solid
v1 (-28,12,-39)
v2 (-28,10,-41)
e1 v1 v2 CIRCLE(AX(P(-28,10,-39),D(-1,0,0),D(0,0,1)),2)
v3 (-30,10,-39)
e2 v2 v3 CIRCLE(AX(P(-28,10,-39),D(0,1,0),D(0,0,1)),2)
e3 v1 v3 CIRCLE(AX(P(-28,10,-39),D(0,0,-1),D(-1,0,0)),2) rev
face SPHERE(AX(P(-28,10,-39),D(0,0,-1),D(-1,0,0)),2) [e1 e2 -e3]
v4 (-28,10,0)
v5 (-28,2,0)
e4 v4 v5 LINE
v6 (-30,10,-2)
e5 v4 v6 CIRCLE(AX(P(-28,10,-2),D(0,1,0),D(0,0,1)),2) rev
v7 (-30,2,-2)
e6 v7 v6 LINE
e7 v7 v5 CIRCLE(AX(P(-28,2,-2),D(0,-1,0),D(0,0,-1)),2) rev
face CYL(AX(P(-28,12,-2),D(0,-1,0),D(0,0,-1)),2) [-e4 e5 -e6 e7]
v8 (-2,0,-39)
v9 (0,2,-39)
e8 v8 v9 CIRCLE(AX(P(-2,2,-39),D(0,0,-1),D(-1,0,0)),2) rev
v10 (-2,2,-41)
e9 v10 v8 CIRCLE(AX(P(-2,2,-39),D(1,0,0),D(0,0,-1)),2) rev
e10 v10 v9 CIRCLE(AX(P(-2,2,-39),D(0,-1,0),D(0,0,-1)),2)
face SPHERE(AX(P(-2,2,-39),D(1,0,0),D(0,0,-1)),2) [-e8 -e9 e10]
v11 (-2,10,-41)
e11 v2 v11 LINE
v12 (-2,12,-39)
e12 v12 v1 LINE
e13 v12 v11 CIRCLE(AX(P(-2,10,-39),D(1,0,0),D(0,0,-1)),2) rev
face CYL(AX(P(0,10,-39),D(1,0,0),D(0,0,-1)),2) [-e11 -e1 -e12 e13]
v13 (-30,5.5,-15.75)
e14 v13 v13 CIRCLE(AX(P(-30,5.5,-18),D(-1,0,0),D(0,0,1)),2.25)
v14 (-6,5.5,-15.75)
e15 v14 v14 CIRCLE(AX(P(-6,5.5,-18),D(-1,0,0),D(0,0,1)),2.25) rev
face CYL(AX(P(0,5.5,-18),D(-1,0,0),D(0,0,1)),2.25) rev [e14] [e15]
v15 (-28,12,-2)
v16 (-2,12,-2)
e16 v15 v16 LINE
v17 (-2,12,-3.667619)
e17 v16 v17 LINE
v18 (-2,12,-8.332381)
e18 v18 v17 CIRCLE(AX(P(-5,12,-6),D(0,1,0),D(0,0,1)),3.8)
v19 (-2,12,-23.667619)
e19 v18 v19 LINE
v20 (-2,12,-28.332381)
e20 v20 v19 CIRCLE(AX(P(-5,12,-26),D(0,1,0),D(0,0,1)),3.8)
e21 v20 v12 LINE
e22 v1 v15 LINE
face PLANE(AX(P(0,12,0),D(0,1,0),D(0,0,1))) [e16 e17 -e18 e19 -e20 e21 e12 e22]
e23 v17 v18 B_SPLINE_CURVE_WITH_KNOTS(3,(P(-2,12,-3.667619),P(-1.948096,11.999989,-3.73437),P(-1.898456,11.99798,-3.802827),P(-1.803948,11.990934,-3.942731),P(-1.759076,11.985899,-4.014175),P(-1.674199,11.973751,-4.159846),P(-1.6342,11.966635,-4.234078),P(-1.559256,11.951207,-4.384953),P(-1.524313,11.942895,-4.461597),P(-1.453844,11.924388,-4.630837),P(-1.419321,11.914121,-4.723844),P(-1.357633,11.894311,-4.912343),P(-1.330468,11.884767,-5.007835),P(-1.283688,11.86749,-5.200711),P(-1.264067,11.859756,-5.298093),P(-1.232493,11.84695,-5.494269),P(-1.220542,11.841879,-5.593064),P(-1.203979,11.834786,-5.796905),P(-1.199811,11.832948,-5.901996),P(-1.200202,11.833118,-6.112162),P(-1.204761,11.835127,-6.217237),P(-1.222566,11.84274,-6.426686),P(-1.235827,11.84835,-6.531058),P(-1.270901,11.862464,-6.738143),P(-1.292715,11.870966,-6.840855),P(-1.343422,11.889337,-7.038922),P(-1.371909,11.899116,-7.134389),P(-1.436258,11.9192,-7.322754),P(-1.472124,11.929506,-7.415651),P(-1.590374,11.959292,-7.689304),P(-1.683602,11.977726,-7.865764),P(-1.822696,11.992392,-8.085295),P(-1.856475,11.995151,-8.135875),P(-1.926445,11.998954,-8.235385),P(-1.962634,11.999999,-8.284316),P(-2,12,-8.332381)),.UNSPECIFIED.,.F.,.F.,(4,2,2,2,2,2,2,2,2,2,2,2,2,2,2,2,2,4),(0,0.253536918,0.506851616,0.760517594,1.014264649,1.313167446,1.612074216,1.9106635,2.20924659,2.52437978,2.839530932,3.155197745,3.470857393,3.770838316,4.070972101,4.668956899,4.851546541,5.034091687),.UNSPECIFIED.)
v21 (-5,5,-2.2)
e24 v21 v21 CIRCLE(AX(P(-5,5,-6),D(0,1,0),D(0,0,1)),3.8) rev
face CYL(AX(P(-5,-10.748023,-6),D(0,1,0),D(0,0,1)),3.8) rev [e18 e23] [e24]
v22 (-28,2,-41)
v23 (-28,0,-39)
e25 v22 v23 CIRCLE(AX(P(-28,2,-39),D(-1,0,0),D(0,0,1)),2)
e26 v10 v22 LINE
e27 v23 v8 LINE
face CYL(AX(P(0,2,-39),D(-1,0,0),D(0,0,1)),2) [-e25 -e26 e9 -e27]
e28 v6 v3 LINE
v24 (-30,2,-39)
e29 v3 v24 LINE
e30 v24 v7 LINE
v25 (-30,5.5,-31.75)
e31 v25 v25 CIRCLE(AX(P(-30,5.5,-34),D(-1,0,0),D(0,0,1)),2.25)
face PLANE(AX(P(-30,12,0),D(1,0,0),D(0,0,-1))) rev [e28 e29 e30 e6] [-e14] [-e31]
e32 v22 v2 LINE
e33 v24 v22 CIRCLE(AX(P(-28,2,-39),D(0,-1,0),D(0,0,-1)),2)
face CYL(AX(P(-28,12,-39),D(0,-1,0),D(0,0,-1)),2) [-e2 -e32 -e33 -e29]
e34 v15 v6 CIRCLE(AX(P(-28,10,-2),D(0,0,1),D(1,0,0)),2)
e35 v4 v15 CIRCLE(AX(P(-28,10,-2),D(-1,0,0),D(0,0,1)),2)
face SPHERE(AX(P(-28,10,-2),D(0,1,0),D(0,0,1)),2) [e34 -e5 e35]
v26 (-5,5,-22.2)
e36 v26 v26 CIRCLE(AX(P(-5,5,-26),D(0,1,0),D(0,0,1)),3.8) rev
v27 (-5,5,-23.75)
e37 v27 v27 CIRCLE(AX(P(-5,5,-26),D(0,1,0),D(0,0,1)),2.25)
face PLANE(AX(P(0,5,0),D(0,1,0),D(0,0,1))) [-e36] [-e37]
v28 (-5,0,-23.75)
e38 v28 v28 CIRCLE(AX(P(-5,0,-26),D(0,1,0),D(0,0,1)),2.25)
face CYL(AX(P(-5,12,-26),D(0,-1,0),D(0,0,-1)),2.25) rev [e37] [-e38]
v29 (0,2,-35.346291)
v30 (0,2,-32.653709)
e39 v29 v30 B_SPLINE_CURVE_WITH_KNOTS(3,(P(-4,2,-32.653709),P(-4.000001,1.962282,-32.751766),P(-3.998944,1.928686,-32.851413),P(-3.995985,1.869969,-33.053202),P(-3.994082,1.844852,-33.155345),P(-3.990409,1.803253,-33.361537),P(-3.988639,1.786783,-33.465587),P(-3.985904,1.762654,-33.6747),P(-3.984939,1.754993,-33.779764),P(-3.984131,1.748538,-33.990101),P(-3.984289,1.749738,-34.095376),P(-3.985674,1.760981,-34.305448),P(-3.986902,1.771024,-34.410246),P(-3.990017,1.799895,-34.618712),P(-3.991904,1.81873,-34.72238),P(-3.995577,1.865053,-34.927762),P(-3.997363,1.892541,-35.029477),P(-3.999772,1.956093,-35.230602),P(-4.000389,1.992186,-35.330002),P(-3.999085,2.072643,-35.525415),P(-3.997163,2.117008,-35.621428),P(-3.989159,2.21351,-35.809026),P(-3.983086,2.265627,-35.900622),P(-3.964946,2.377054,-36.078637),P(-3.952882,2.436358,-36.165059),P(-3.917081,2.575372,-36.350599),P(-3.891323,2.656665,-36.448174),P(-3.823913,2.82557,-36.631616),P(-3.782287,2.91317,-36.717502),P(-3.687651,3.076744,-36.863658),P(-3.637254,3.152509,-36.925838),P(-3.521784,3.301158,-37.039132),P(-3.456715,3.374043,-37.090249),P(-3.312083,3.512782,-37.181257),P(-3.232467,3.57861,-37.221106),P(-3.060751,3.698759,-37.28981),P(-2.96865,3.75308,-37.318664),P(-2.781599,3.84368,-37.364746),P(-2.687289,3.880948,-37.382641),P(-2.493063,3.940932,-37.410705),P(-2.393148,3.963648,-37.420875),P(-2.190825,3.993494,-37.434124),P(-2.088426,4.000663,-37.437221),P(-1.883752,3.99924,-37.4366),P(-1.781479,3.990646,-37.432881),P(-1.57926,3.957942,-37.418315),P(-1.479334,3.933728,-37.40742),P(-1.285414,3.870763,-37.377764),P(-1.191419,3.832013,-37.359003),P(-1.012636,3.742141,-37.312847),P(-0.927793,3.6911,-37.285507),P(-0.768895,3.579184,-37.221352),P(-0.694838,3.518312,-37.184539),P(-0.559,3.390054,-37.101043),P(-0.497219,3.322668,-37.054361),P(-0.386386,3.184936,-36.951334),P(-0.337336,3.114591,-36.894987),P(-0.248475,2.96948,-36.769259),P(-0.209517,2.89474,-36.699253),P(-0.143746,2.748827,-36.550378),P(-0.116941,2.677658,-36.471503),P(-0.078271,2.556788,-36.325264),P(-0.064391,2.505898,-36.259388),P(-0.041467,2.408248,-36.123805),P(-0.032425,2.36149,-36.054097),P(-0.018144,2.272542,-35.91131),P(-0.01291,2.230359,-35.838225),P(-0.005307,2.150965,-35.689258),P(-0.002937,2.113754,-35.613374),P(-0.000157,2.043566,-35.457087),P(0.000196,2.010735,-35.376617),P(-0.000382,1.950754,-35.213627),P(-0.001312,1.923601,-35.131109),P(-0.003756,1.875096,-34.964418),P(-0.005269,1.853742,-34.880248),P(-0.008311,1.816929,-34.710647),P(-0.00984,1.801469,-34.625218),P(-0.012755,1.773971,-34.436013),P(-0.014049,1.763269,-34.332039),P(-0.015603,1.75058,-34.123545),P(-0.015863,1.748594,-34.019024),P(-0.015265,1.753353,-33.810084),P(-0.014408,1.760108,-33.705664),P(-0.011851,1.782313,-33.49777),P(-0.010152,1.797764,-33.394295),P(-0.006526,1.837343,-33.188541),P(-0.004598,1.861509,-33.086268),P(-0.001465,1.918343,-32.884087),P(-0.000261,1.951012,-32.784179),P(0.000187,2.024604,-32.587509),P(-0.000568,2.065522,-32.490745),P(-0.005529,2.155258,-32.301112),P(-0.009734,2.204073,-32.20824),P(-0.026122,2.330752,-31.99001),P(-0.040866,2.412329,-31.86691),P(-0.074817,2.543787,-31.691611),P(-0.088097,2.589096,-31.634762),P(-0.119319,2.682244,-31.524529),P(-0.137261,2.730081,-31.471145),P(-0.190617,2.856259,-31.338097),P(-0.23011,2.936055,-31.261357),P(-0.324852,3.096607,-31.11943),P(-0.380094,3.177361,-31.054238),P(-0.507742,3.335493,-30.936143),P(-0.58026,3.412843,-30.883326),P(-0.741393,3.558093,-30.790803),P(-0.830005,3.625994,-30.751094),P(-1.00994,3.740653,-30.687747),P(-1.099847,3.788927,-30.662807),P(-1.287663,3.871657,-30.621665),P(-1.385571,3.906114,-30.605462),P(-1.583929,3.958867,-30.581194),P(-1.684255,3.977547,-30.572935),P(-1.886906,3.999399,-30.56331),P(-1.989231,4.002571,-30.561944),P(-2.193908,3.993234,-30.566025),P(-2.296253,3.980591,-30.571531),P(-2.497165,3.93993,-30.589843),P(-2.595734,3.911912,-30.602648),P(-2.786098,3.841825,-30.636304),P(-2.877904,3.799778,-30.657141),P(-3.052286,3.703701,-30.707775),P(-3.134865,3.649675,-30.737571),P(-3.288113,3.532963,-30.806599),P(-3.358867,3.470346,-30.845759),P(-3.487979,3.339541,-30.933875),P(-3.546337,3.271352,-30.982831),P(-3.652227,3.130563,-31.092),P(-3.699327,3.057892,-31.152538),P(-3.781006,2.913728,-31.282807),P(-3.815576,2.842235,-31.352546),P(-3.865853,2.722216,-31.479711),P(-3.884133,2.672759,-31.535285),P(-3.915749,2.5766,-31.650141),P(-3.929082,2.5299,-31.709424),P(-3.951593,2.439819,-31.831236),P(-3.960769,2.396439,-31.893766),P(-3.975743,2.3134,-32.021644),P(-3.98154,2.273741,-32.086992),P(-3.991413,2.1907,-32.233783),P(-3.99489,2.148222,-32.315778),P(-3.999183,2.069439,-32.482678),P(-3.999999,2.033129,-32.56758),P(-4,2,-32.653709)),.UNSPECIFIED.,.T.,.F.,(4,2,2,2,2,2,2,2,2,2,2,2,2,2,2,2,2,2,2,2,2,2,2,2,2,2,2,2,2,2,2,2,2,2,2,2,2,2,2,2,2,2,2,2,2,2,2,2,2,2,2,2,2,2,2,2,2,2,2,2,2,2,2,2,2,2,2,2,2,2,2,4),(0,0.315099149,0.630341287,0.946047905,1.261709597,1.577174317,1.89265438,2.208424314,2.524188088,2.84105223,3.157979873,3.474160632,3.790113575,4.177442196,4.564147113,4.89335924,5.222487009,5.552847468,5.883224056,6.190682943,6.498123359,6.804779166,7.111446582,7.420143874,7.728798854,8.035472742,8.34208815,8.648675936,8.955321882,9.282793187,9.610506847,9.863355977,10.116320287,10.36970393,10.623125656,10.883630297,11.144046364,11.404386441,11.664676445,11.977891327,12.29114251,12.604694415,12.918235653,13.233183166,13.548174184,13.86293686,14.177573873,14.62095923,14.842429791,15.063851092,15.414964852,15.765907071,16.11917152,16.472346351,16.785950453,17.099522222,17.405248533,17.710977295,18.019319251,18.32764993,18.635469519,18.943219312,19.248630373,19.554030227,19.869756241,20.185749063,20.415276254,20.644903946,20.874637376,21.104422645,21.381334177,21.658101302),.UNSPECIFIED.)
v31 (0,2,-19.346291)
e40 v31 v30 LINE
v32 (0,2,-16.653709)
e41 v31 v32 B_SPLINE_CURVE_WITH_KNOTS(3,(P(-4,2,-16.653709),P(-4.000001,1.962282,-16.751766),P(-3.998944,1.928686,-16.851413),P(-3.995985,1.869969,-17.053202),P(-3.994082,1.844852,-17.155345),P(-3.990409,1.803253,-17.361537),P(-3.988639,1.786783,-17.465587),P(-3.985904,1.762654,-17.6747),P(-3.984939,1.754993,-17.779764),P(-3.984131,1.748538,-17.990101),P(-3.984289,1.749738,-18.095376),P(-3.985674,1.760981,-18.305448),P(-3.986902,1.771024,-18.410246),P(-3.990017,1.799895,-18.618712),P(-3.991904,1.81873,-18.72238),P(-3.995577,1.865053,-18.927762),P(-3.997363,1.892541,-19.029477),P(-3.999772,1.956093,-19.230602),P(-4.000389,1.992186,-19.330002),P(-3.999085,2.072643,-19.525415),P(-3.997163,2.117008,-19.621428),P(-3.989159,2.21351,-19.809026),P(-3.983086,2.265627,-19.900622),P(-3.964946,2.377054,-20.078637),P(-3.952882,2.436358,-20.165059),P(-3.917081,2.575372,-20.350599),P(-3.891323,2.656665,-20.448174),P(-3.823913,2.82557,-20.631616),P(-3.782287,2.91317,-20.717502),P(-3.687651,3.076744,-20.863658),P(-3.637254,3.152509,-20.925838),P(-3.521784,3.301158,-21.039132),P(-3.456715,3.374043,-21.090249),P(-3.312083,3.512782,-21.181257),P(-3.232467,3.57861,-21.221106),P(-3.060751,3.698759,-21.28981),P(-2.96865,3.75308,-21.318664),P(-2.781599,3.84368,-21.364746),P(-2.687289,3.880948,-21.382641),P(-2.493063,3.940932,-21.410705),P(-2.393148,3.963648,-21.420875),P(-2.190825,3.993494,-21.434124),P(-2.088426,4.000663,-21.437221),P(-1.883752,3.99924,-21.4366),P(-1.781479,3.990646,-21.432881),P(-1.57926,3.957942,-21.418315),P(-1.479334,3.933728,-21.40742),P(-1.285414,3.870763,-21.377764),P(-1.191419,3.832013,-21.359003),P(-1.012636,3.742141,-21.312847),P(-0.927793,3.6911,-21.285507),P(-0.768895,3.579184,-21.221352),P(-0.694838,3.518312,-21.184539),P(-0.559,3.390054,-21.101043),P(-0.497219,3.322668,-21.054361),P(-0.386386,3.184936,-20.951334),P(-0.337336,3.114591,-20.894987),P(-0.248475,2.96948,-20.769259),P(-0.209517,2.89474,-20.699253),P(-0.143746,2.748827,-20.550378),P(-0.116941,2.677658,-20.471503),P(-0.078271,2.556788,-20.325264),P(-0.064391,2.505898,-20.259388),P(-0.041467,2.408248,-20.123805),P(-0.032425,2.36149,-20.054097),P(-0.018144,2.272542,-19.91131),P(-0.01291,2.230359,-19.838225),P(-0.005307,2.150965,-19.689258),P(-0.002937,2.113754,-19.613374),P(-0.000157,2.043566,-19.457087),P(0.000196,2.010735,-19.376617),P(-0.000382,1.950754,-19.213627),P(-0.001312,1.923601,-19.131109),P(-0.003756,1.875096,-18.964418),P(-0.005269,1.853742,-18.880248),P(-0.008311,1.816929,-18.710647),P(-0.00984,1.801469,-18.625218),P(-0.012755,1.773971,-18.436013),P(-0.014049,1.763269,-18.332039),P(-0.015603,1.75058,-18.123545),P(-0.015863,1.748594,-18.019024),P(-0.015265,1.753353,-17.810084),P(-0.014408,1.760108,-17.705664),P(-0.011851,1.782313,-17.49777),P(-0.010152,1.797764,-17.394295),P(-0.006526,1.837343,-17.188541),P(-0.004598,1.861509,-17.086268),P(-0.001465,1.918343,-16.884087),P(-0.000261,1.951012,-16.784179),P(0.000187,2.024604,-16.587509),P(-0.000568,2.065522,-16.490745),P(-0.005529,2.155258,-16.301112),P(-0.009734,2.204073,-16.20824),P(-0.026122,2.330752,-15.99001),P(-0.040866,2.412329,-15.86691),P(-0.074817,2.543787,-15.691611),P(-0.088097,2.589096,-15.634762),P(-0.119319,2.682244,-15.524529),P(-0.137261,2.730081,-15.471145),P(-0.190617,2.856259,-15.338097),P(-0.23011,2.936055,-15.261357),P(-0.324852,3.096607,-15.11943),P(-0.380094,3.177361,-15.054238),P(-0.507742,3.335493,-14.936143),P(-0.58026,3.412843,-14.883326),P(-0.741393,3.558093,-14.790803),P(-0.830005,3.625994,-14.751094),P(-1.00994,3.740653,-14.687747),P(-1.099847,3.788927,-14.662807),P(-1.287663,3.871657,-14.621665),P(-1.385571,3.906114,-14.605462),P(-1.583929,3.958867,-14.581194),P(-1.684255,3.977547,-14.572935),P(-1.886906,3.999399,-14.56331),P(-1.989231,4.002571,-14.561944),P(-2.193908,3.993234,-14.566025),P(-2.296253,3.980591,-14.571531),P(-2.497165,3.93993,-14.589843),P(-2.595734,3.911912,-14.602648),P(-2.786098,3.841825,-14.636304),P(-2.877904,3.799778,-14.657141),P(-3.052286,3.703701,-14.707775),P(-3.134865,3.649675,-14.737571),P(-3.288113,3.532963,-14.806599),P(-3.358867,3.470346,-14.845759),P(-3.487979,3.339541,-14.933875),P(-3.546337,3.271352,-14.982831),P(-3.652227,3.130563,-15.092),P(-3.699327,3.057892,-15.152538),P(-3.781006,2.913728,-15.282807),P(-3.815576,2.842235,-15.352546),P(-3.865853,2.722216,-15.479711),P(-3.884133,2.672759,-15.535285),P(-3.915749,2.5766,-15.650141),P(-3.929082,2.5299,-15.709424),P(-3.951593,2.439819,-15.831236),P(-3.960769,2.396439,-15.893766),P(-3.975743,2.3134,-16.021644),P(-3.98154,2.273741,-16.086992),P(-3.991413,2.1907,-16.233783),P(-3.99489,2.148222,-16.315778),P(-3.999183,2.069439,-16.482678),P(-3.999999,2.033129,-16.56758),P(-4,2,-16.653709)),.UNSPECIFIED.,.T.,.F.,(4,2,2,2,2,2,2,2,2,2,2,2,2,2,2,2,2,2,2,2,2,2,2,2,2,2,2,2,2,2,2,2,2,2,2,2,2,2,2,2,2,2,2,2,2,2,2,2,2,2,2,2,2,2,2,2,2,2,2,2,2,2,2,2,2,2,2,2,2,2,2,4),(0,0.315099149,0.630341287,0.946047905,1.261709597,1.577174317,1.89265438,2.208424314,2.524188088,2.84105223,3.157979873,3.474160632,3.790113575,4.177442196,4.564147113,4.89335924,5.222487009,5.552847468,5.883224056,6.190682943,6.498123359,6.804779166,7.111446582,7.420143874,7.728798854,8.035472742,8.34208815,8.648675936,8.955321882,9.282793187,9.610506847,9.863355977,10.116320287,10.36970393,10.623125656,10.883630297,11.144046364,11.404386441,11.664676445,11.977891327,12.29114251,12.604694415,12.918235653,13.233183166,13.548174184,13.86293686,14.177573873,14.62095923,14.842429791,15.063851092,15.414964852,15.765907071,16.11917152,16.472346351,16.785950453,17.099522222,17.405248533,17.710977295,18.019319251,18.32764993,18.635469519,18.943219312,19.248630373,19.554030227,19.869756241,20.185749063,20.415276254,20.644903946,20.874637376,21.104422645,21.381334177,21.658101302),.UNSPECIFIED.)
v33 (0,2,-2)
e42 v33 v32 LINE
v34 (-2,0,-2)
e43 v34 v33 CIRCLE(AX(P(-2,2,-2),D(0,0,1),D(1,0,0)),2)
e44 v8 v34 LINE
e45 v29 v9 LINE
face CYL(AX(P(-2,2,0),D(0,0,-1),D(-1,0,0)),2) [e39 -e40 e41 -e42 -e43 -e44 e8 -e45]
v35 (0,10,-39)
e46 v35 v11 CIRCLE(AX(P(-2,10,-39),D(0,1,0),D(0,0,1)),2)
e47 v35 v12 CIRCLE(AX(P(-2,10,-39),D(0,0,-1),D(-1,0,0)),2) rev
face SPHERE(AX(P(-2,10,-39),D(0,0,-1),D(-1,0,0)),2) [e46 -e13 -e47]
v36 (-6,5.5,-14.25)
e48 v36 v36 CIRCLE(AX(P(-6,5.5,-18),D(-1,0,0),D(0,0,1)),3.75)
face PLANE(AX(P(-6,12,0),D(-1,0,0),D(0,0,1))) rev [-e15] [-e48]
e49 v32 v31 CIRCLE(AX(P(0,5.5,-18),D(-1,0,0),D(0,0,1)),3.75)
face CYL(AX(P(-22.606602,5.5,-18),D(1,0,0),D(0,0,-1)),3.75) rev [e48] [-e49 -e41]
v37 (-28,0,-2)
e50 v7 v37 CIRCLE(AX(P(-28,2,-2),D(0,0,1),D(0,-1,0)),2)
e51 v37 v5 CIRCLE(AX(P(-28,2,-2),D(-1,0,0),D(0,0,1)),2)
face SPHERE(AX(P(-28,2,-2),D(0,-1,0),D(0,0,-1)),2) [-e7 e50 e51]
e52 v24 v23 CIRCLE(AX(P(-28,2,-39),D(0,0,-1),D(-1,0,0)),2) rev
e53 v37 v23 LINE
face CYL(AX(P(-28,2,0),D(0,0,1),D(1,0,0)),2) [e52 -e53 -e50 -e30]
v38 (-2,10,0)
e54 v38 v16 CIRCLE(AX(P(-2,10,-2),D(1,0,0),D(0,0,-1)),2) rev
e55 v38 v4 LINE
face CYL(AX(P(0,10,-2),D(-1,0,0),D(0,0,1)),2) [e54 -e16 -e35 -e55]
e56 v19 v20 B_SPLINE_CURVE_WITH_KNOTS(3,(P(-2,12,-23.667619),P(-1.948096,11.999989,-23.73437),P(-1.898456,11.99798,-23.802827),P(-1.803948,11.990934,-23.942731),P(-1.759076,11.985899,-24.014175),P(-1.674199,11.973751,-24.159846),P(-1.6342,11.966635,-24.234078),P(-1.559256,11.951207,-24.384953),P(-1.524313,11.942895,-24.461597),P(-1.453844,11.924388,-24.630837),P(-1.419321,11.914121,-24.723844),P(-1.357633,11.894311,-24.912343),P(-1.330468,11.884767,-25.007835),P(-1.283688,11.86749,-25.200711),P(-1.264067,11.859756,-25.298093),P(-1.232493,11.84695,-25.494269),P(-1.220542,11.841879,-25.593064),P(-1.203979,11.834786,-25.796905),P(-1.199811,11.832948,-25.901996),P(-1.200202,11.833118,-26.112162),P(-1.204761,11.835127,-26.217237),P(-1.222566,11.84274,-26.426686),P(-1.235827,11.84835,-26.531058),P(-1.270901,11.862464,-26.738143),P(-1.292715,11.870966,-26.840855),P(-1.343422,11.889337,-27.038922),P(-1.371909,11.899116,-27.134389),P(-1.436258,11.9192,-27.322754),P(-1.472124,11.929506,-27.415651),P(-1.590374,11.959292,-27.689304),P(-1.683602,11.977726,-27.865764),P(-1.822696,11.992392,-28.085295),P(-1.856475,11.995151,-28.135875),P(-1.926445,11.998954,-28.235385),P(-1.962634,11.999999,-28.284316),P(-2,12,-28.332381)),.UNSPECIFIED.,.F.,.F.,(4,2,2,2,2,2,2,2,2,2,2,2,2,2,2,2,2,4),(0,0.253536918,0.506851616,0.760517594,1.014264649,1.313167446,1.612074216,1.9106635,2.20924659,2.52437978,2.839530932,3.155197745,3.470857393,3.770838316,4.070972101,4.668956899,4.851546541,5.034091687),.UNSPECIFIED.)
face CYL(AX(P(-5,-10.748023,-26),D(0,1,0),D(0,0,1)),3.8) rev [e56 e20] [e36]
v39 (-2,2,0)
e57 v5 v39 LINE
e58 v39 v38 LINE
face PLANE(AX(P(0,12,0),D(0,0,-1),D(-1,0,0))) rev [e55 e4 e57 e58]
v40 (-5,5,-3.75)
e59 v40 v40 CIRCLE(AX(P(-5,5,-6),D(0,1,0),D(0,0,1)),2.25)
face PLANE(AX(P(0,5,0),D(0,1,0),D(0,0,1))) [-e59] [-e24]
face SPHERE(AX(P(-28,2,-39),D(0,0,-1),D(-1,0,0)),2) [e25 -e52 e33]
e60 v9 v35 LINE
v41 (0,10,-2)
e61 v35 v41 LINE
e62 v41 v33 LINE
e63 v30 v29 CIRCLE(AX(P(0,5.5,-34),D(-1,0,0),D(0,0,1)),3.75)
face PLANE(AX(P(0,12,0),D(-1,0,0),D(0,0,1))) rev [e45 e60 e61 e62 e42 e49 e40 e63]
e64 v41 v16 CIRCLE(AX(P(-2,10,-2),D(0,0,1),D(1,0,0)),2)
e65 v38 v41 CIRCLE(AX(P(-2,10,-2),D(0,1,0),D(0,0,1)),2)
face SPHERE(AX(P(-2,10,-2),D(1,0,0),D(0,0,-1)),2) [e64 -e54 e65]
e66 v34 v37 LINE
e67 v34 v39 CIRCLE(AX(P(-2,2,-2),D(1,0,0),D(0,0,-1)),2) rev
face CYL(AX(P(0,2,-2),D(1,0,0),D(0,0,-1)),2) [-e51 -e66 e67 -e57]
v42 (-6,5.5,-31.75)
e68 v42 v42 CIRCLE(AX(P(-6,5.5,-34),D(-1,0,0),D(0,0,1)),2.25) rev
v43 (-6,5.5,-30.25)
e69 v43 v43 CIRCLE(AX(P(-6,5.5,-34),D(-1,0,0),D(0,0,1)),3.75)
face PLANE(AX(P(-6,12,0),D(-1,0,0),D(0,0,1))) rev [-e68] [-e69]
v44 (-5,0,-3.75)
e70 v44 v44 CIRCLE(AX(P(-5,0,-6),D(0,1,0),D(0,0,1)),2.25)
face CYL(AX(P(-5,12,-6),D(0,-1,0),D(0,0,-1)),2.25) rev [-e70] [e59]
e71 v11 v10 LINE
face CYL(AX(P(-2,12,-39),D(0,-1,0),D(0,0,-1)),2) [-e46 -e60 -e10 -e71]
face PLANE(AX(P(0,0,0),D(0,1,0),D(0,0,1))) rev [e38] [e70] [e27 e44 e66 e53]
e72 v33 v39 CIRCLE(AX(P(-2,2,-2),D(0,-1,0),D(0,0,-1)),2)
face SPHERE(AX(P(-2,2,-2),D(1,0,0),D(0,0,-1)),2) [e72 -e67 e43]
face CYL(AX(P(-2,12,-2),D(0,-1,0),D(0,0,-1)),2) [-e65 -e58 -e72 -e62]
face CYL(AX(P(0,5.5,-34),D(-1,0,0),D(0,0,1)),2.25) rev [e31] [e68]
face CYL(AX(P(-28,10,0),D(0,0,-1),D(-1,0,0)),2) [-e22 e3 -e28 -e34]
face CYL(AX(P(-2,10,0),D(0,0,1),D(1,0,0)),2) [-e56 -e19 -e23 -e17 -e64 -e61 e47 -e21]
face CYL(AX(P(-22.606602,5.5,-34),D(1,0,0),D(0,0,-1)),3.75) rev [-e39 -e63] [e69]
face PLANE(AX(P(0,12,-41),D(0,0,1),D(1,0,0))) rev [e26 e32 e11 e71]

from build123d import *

# Parameters (mm, degrees)
SKETCH1_W           = 30
SKETCH1_H           = 41
SKETCH1_R           = 2.25
BOSS_EXTRUDE1_DEPTH = 12
SKETCH3_R           = 3.8
CUT_EXTRUDE2_DEPTH  = 7
FILLET1_R           = 2
SKETCH4_R           = 2.25
CUT_EXTRUDE3_DEPTH  = 53.201532625
CUT_EXTRUDE4_START  = -30
SKETCH5_R           = 3.75
CUT_EXTRUDE4_DEPTH  = 6


with BuildPart() as part:
    # Sketch1 → Boss-Extrude1 (new body)
    with BuildSketch(Plane(origin=(0, 0, 0), x_dir=(1, 0, 0), z_dir=(0, 1, 0))):
        with Locations((-15, 20.5)):
            Rectangle(SKETCH1_W, SKETCH1_H)
        with Locations(Location((-5, 6, 0), (0, 0, 270))):
            Circle(SKETCH1_R, mode=Mode.SUBTRACT)
        with Locations(Location((-5, 26, 0), (0, 0, 270))):
            Circle(SKETCH1_R, mode=Mode.SUBTRACT)
    extrude(amount=BOSS_EXTRUDE1_DEPTH)

    # Sketch3 → Cut-Extrude2 (cut)
    with BuildSketch(Plane(origin=(0, 12, 0), x_dir=(1, 0, 0), z_dir=(0, 1, 0))):
        with Locations(Location((-5, 26, 0), (0, 0, 270))):
            Circle(SKETCH3_R)
        with Locations(Location((-5, 6, 0), (0, 0, 270))):
            Circle(SKETCH3_R)
    extrude(amount=-CUT_EXTRUDE2_DEPTH, mode=Mode.SUBTRACT)

    # Fillet1
    # the kernel refuses this fillet: 2 mm, written as the material it takes off along each edge
    with BuildSketch(Plane(origin=(-28, 10, -2), x_dir=(-1, 0, 0), z_dir=(0, 0, 1))) as fillet1_piece_1_section:
        Polygon((0, 0), (FILLET1_R, 0), (FILLET1_R, -FILLET1_R), (0, -FILLET1_R), align=None)
    fillet1_piece_1 = extrude(amount=FILLET1_R, mode=Mode.PRIVATE)
    fillet1_piece_1 = fillet1_piece_1 - Plane(origin=(-28, 10, -2), x_dir=(0.7071067811865475, -0.7071067811865475, 0), z_dir=(0, 0, 1)) * Sphere(FILLET1_R, mode=Mode.PRIVATE)
    add(fillet1_piece_1, mode=Mode.SUBTRACT)
    with BuildSketch(Plane(origin=(-28, 10, -39), x_dir=(0, 1, 0), z_dir=(-1, 0, 0))) as fillet1_piece_2_section:
        Polygon((0, 0), (FILLET1_R, 0), (FILLET1_R, FILLET1_R), (0, FILLET1_R), align=None)
    fillet1_piece_2 = extrude(amount=FILLET1_R, mode=Mode.PRIVATE)
    fillet1_piece_2 = fillet1_piece_2 - Plane(origin=(-28, 10, -39), x_dir=(0, -0.7071067811865475, 0.7071067811865475), z_dir=(-1, 0, 0)) * Sphere(FILLET1_R, mode=Mode.PRIVATE)
    add(fillet1_piece_2, mode=Mode.SUBTRACT)
    with BuildSketch(Plane(origin=(-2, 10, -2), x_dir=(1, 0, 0), z_dir=(0, 0, 1))) as fillet1_piece_3_section:
        Polygon((0, 0), (FILLET1_R, 0), (FILLET1_R, FILLET1_R), (0, FILLET1_R), align=None)
    fillet1_piece_3 = extrude(amount=FILLET1_R, mode=Mode.PRIVATE)
    fillet1_piece_3 = fillet1_piece_3 - Plane(origin=(-2, 10, -2), x_dir=(-0.7071067811865475, -0.7071067811865475, 0), z_dir=(0, 0, 1)) * Sphere(FILLET1_R, mode=Mode.PRIVATE)
    add(fillet1_piece_3, mode=Mode.SUBTRACT)
    with BuildSketch(Plane(origin=(-2, 10, -39), x_dir=(0, 1, 0), z_dir=(1, 0, 0))) as fillet1_piece_4_section:
        Polygon((0, 0), (FILLET1_R, 0), (FILLET1_R, -FILLET1_R), (0, -FILLET1_R), align=None)
    fillet1_piece_4 = extrude(amount=FILLET1_R, mode=Mode.PRIVATE)
    fillet1_piece_4 = fillet1_piece_4 - Plane(origin=(-2, 10, -39), x_dir=(0, -0.7071067811865475, 0.7071067811865475), z_dir=(1, 0, 0)) * Sphere(FILLET1_R, mode=Mode.PRIVATE)
    add(fillet1_piece_4, mode=Mode.SUBTRACT)
    with BuildSketch(Plane(origin=(-2, 2, -2), x_dir=(1, 0, 0), z_dir=(0, 0, 1))) as fillet1_piece_5_section:
        Polygon((0, 0), (FILLET1_R, 0), (FILLET1_R, -FILLET1_R), (0, -FILLET1_R), align=None)
    fillet1_piece_5 = extrude(amount=FILLET1_R, mode=Mode.PRIVATE)
    fillet1_piece_5 = fillet1_piece_5 - Plane(origin=(-2, 2, -2), x_dir=(-0.7071067811865475, 0.7071067811865475, 0), z_dir=(0, 0, 1)) * Sphere(FILLET1_R, mode=Mode.PRIVATE)
    add(fillet1_piece_5, mode=Mode.SUBTRACT)
    with BuildSketch(Plane(origin=(-28, 2, -2), x_dir=(-1, 0, 0), z_dir=(0, 0, 1))) as fillet1_piece_6_section:
        Polygon((0, 0), (FILLET1_R, 0), (FILLET1_R, FILLET1_R), (0, FILLET1_R), align=None)
    fillet1_piece_6 = extrude(amount=FILLET1_R, mode=Mode.PRIVATE)
    fillet1_piece_6 = fillet1_piece_6 - Plane(origin=(-28, 2, -2), x_dir=(0.7071067811865475, 0.7071067811865475, 0), z_dir=(0, 0, 1)) * Sphere(FILLET1_R, mode=Mode.PRIVATE)
    add(fillet1_piece_6, mode=Mode.SUBTRACT)
    with BuildSketch(Plane(origin=(-28, 2, -39), x_dir=(0, -1, 0), z_dir=(-1, 0, 0))) as fillet1_piece_7_section:
        Polygon((0, 0), (FILLET1_R, 0), (FILLET1_R, -FILLET1_R), (0, -FILLET1_R), align=None)
    fillet1_piece_7 = extrude(amount=FILLET1_R, mode=Mode.PRIVATE)
    fillet1_piece_7 = fillet1_piece_7 - Plane(origin=(-28, 2, -39), x_dir=(0, 0.7071067811865475, 0.7071067811865475), z_dir=(-1, 0, 0)) * Sphere(FILLET1_R, mode=Mode.PRIVATE)
    add(fillet1_piece_7, mode=Mode.SUBTRACT)
    with BuildSketch(Plane(origin=(-2, 2, -39), x_dir=(0, -1, 0), z_dir=(1, 0, 0))) as fillet1_piece_8_section:
        Polygon((0, 0), (FILLET1_R, 0), (FILLET1_R, FILLET1_R), (0, FILLET1_R), align=None)
    fillet1_piece_8 = extrude(amount=FILLET1_R, mode=Mode.PRIVATE)
    fillet1_piece_8 = fillet1_piece_8 - Plane(origin=(-2, 2, -39), x_dir=(0, 0.7071067811865475, 0.7071067811865475), z_dir=(1, 0, 0)) * Sphere(FILLET1_R, mode=Mode.PRIVATE)
    add(fillet1_piece_8, mode=Mode.SUBTRACT)
    with BuildSketch(Plane(origin=(-30, 12, -2), x_dir=(0, -1, 0), z_dir=(0, 0, -1)), Plane(origin=(0, 12, -39), x_dir=(0, -1, 0), z_dir=(0, 0, 1))) as fillet1_piece_9:
        with BuildLine():
            CenterArc((FILLET1_R, -FILLET1_R), FILLET1_R, 90, 90)
            Line((0, -FILLET1_R), (0, 0))
            Line((0, 0), (FILLET1_R, 0))
        make_face()
    extrude(amount=37, mode=Mode.SUBTRACT)
    with BuildSketch(Plane(origin=(-2, 12, 0), x_dir=(0, -1, 0), z_dir=(-1, 0, 0)), Plane(origin=(-28, 0, -41), x_dir=(0, 0, 1), z_dir=(1, 0, 0))) as fillet1_piece_10:
        with BuildLine():
            CenterArc((FILLET1_R, -FILLET1_R), FILLET1_R, 90, 90)
            Line((0, -FILLET1_R), (0, 0))
            Line((0, 0), (FILLET1_R, 0))
        make_face()
    extrude(amount=26, mode=Mode.SUBTRACT)
    with BuildSketch(Plane(origin=(-2, 0, 0), x_dir=(0, 1, 0), z_dir=(-1, 0, 0)), Plane(origin=(-28, 12, -41), x_dir=(0, 0, 1), z_dir=(1, 0, 0))) as fillet1_piece_11:
        with BuildLine():
            CenterArc((FILLET1_R, FILLET1_R), FILLET1_R, 180, 90)
            Line((0, FILLET1_R), (0, 0))
            Line((0, 0), (FILLET1_R, 0))
        make_face()
    extrude(amount=26, mode=Mode.SUBTRACT)
    with BuildSketch(Plane(origin=(-30, 0, -2), x_dir=(0, 1, 0), z_dir=(0, 0, -1)), Plane(origin=(0, 0, -39), x_dir=(0, 1, 0), z_dir=(0, 0, 1))) as fillet1_piece_12:
        with BuildLine():
            CenterArc((FILLET1_R, FILLET1_R), FILLET1_R, 180, 90)
            Line((0, FILLET1_R), (0, 0))
            Line((0, 0), (FILLET1_R, 0))
        make_face()
    extrude(amount=37, mode=Mode.SUBTRACT)
    with BuildSketch(Plane(origin=(0, 2, 0), x_dir=(-1, 0, 0), z_dir=(0, 1, 0)), Plane(origin=(0, 2, -41), x_dir=(0, 0, 1), z_dir=(0, 1, 0))) as fillet1_piece_13:
        with BuildLine():
            CenterArc((FILLET1_R, -FILLET1_R), FILLET1_R, 90, 90)
            Line((0, -FILLET1_R), (0, 0))
            Line((0, 0), (FILLET1_R, 0))
        make_face()
    extrude(amount=8, mode=Mode.SUBTRACT)
    with BuildSketch(Plane(origin=(-30, 2, 0), x_dir=(1, 0, 0), z_dir=(0, 1, 0)), Plane(origin=(-30, 2, -41), x_dir=(0, 0, 1), z_dir=(0, 1, 0))) as fillet1_piece_14:
        with BuildLine():
            CenterArc((FILLET1_R, FILLET1_R), FILLET1_R, 180, 90)
            Line((0, FILLET1_R), (0, 0))
            Line((0, 0), (FILLET1_R, 0))
        make_face()
    extrude(amount=8, mode=Mode.SUBTRACT)

    # Sketch4 → Cut-Extrude3 (cut, through all)
    with BuildSketch(Plane.ZY.offset(30)):
        with Locations((-34, 5.5)):
            Circle(SKETCH4_R)
        with Locations((-18, 5.5)):
            Circle(SKETCH4_R)
    extrude(amount=-CUT_EXTRUDE3_DEPTH, mode=Mode.SUBTRACT)

    # Sketch5 → Cut-Extrude4 (cut)
    with BuildSketch(Plane.ZY.offset(30).offset(CUT_EXTRUDE4_START)):
        with Locations(Location((-34, 5.5, 0), (0, 0, 248.960530219))):
            Circle(SKETCH5_R)
        with Locations(Location((-18, 5.5, 0), (0, 0, 248.960530219))):
            Circle(SKETCH5_R)
    extrude(amount=CUT_EXTRUDE4_DEPTH, mode=Mode.SUBTRACT)


solid = part.part
